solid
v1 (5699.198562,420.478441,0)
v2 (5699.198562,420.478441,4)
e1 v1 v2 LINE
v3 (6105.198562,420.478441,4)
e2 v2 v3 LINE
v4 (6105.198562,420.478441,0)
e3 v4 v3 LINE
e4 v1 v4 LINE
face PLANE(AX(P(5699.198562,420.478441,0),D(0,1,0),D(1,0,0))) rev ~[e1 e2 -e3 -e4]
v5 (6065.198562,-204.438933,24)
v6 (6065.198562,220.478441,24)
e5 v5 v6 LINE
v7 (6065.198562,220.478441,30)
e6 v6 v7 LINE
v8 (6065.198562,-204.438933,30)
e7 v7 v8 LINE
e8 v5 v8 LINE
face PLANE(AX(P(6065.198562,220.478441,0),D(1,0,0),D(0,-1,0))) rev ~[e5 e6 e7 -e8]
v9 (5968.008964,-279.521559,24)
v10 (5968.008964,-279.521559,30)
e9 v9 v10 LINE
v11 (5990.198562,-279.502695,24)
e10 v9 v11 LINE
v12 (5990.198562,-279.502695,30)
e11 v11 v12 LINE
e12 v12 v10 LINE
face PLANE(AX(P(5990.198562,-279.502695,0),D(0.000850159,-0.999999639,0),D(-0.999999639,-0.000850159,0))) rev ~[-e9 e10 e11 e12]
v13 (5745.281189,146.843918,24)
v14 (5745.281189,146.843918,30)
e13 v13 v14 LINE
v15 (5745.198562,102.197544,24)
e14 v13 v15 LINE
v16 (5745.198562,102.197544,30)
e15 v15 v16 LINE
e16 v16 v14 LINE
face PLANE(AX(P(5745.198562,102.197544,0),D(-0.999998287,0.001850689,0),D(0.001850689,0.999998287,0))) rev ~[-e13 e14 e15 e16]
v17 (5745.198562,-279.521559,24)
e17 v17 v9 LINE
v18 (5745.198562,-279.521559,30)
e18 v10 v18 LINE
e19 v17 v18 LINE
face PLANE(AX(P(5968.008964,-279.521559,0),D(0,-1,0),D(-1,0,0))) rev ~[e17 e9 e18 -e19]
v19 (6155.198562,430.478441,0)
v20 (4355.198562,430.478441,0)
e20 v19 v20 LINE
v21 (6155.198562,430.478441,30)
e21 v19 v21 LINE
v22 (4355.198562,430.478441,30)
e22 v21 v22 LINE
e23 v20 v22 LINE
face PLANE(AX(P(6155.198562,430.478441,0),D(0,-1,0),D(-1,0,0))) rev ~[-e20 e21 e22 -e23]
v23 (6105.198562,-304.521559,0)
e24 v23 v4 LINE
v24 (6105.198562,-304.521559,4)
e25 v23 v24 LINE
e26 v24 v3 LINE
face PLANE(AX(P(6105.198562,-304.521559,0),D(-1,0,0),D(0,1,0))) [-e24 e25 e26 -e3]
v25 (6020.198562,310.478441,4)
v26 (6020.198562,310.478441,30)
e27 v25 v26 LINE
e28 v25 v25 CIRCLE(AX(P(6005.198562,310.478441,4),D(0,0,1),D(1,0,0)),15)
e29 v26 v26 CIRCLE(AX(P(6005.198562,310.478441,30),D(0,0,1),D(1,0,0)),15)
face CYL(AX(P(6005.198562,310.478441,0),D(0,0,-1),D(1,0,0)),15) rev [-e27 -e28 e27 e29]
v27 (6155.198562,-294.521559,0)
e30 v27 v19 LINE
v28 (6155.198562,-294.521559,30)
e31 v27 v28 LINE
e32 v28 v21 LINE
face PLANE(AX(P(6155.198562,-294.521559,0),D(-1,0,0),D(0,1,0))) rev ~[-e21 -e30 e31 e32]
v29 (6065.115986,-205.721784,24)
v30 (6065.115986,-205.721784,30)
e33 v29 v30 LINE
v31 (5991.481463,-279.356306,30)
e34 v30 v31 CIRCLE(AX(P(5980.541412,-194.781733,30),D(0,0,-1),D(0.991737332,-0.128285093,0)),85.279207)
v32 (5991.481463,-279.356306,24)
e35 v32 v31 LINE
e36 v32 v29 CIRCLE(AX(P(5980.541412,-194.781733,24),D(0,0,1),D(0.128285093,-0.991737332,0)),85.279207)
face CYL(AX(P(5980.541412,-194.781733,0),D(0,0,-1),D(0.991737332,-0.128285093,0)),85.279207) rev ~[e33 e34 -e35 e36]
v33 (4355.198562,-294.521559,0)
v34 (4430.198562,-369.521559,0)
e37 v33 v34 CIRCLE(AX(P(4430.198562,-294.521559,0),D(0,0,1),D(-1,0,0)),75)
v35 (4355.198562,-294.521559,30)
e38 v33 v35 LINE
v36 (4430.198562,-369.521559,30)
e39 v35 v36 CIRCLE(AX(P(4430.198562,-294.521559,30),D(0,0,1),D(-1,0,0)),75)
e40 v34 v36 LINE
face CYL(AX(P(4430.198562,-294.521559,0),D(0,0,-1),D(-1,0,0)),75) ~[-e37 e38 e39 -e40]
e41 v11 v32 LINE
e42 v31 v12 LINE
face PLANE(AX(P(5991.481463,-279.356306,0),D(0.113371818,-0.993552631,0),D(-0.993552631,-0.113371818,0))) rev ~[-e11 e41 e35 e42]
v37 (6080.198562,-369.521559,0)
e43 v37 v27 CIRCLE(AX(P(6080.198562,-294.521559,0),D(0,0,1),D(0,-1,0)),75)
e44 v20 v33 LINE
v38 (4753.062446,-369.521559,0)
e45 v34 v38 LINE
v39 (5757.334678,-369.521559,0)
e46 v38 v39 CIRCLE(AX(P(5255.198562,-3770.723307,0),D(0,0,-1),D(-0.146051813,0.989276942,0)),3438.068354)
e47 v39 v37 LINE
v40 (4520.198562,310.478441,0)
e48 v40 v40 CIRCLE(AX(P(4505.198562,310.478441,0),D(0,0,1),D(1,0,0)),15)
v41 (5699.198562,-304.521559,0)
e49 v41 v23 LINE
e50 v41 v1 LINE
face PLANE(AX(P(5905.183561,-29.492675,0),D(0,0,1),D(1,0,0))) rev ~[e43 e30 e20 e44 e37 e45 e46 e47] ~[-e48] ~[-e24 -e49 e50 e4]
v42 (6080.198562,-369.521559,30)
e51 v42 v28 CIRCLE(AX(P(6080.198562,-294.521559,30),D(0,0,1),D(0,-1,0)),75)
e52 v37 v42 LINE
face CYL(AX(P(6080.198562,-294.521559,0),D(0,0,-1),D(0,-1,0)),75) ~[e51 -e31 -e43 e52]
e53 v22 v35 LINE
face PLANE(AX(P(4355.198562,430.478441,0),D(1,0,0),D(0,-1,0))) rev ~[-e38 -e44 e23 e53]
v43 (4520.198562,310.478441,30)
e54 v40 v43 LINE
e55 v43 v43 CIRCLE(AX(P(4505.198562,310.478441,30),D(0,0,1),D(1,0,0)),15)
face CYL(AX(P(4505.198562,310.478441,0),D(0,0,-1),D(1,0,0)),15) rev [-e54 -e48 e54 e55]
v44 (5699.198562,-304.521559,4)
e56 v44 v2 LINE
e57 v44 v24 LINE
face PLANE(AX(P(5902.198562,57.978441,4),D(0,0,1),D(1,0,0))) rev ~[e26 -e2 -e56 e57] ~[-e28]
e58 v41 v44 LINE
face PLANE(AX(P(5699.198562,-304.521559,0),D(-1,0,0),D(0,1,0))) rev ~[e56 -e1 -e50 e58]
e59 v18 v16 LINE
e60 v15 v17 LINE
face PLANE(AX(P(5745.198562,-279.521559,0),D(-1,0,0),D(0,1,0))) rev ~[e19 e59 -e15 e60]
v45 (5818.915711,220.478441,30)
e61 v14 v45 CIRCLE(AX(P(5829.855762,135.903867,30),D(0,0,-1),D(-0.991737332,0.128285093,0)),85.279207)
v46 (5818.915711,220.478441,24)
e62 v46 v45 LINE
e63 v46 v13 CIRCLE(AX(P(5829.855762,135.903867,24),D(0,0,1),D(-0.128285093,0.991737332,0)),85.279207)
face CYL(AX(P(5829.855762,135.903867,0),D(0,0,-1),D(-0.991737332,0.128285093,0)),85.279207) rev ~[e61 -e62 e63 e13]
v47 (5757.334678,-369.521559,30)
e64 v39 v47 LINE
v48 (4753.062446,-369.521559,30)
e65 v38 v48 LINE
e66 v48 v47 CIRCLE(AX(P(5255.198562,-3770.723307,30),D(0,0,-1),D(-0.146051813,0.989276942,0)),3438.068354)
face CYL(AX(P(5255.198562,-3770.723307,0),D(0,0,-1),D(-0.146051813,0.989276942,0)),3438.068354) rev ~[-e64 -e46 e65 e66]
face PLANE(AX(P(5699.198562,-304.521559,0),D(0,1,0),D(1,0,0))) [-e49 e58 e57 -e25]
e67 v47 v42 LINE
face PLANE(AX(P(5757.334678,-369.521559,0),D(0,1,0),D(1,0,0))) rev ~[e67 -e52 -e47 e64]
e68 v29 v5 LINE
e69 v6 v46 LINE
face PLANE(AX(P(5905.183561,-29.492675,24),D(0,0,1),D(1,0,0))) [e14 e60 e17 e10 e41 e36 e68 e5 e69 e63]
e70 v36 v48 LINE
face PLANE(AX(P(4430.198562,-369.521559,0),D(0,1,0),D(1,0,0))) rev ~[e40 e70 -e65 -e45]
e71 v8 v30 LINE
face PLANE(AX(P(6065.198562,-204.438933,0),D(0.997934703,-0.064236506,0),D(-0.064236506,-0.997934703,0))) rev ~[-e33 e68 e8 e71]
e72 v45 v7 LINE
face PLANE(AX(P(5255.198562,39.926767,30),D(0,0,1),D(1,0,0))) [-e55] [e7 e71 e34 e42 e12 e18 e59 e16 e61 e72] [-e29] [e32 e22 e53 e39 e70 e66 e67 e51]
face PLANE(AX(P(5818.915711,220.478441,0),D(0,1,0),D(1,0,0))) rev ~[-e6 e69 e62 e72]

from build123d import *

# Parameters (mm, degrees)
F0_R     = 15
F1_DEPTH = 30
F2_DEPTH = 24
F3_W     = 406
F3_H     = 725
F3_R     = 15
F4_DEPTH = 4


# Not quite as in the source:
# - a feature names something its author has since deleted; it is built from what else it names


with BuildPart() as f1:
    # F0 (on Top) → F1 (new body)
    with BuildSketch(Plane.XY):
        with BuildLine():
            ThreePointArc((4355.1985619355, -294.5215593797), (4377.1655533465, -347.5545679687), (4430.1985619355, -369.5215593797))
            Line((4430.1985619355, -369.5215593797), (4753.0624461818, -369.5215593797))
            ThreePointArc((4753.0624461818, -369.5215593797), (5255.1985619355, -332.6549530029), (5757.3346776893, -369.5215593797))
            Line((5757.3346776893, -369.5215593797), (6080.1985619355, -369.5215593797))
            ThreePointArc((6080.1985619355, -369.5215593797), (6133.2315705245, -347.5545679687), (6155.1985619355, -294.5215593797))
            Line((6155.1985619355, -294.5215593797), (6155.1985619355, 430.4784406203))
            Line((6155.1985619355, 430.4784406203), (4355.1985619355, 430.4784406203))
            Line((4355.1985619355, 430.4784406203), (4355.1985619355, -294.5215593797))
        make_face()
        with BuildLine():
            Line((6065.1985619355, 163.3609871071), (6065.1985619355, -195.1546647585))
            Line((6065.1985619355, -195.1546647585), (6065.1985619355, -204.4389326959))
            Line((6065.1985619355, -204.4389326959), (6065.1159855294, -205.7217836249))
            ThreePointArc((6065.1159855294, -205.7217836249), (6040.8429178387, -255.0832383215), (5991.4814631421, -279.3563060122))
            Line((5991.4814631421, -279.3563060122), (5990.1985619355, -279.5026946765))
            Line((5990.1985619355, -279.5026946765), (5968.0089636665, -279.5215593797))
            Line((5968.0089636665, -279.5215593797), (5745.1985619355, -279.5215593797))
            Line((5745.1985619355, -279.5215593797), (5745.1985619355, 102.1975441552))
            Line((5745.1985619355, 102.1975441552), (5745.2811886192, 146.843918233))
            ThreePointArc((5745.2811886192, 146.843918233), (5769.55425631, 196.2053729296), (5818.9157110066, 220.4784406203))
            Line((5818.9157110066, 220.4784406203), (6065.1985619355, 220.4784406203))
            Line((6065.1985619355, 220.4784406203), (6065.1985619355, 163.3609871071))
        make_face(mode=Mode.SUBTRACT)
        with Locations((4505.1985619355, 310.4784406203)):
            Circle(F0_R, mode=Mode.SUBTRACT)
        with Locations((6005.1985619355, 310.4784406203)):
            Circle(F0_R, mode=Mode.SUBTRACT)
    extrude(amount=F1_DEPTH)

    # F0 (on Top) → F2 (join)
    with BuildSketch(Plane.XY):
        with BuildLine():
            Line((6065.1985619355, -204.4389326959), (6065.1985619355, -195.1546647585))
            Line((6065.1985619355, -195.1546647585), (6065.1985619355, 163.3609871071))
            Line((6065.1985619355, 163.3609871071), (6065.1985619355, 220.4784406203))
            Line((6065.1985619355, 220.4784406203), (5818.9157110066, 220.4784406203))
            ThreePointArc((5818.9157110066, 220.4784406203), (5769.55425631, 196.2053729296), (5745.2811886192, 146.843918233))
            Line((5745.2811886192, 146.843918233), (5745.1985619355, 102.1975441552))
            Line((5745.1985619355, 102.1975441552), (5745.1985619355, -279.5215593797))
            Line((5745.1985619355, -279.5215593797), (5968.0089636665, -279.5215593797))
            Line((5968.0089636665, -279.5215593797), (5990.1985619355, -279.5026946765))
            Line((5990.1985619355, -279.5026946765), (5991.4814631421, -279.3563060122))
            ThreePointArc((5991.4814631421, -279.3563060122), (6040.8429178387, -255.0832383215), (6065.1159855294, -205.7217836249))
            Line((6065.1159855294, -205.7217836249), (6065.1985619355, -204.4389326959))
        make_face()
    extrude(amount=F2_DEPTH)

    # F3 (on face) + F0 (on Top) → F4 (cut)
    with BuildSketch(Plane.XY):
        with Locations((5902.1985619355, 57.9784406203)):
            Rectangle(F3_W, F3_H)
        with BuildLine():
            Line((6065.1985619355, 220.4784406203), (6065.1985619355, 163.3609871071))
            Line((6065.1985619355, 163.3609871071), (6065.1985619355, -195.1546647585))
            Line((6065.1985619355, -195.1546647585), (6065.1985619355, -204.4389326959))
            Line((6065.1985619355, -204.4389326959), (6065.1159855294, -205.7217836249))
            ThreePointArc((6065.1159855294, -205.7217836249), (6040.8429178387, -255.0832383215), (5991.4814631421, -279.3563060122))
            Line((5991.4814631421, -279.3563060122), (5990.1985619355, -279.5026946765))
            Line((5990.1985619355, -279.5026946765), (5968.0089636665, -279.5215593797))
            Line((5968.0089636665, -279.5215593797), (5745.1985619355, -279.5215593797))
            Line((5745.1985619355, -279.5215593797), (5745.1985619355, 102.1975441552))
            Line((5745.1985619355, 102.1975441552), (5745.2811886192, 146.843918233))
            ThreePointArc((5745.2811886192, 146.843918233), (5769.55425631, 196.2053729296), (5818.9157110066, 220.4784406203))
            Line((5818.9157110066, 220.4784406203), (6065.1985619355, 220.4784406203))
        make_face(mode=Mode.SUBTRACT)
        with Locations((6005.1985619355, 310.4784406203)):
            Circle(F3_R, mode=Mode.SUBTRACT)
    with BuildSketch(Plane.XY):
        with BuildLine():
            Line((6065.1985619355, -204.4389326959), (6065.1985619355, -195.1546647585))
            Line((6065.1985619355, -195.1546647585), (6065.1985619355, 163.3609871071))
            Line((6065.1985619355, 163.3609871071), (6065.1985619355, 220.4784406203))
            Line((6065.1985619355, 220.4784406203), (5818.9157110066, 220.4784406203))
            ThreePointArc((5818.9157110066, 220.4784406203), (5769.55425631, 196.2053729296), (5745.2811886192, 146.843918233))
            Line((5745.2811886192, 146.843918233), (5745.1985619355, 102.1975441552))
            Line((5745.1985619355, 102.1975441552), (5745.1985619355, -279.5215593797))
            Line((5745.1985619355, -279.5215593797), (5968.0089636665, -279.5215593797))
            Line((5968.0089636665, -279.5215593797), (5990.1985619355, -279.5026946765))
            Line((5990.1985619355, -279.5026946765), (5991.4814631421, -279.3563060122))
            ThreePointArc((5991.4814631421, -279.3563060122), (6040.8429178387, -255.0832383215), (6065.1159855294, -205.7217836249))
            Line((6065.1159855294, -205.7217836249), (6065.1985619355, -204.4389326959))
        make_face()
    extrude(amount=F4_DEPTH, mode=Mode.SUBTRACT)


solid = f1.part
